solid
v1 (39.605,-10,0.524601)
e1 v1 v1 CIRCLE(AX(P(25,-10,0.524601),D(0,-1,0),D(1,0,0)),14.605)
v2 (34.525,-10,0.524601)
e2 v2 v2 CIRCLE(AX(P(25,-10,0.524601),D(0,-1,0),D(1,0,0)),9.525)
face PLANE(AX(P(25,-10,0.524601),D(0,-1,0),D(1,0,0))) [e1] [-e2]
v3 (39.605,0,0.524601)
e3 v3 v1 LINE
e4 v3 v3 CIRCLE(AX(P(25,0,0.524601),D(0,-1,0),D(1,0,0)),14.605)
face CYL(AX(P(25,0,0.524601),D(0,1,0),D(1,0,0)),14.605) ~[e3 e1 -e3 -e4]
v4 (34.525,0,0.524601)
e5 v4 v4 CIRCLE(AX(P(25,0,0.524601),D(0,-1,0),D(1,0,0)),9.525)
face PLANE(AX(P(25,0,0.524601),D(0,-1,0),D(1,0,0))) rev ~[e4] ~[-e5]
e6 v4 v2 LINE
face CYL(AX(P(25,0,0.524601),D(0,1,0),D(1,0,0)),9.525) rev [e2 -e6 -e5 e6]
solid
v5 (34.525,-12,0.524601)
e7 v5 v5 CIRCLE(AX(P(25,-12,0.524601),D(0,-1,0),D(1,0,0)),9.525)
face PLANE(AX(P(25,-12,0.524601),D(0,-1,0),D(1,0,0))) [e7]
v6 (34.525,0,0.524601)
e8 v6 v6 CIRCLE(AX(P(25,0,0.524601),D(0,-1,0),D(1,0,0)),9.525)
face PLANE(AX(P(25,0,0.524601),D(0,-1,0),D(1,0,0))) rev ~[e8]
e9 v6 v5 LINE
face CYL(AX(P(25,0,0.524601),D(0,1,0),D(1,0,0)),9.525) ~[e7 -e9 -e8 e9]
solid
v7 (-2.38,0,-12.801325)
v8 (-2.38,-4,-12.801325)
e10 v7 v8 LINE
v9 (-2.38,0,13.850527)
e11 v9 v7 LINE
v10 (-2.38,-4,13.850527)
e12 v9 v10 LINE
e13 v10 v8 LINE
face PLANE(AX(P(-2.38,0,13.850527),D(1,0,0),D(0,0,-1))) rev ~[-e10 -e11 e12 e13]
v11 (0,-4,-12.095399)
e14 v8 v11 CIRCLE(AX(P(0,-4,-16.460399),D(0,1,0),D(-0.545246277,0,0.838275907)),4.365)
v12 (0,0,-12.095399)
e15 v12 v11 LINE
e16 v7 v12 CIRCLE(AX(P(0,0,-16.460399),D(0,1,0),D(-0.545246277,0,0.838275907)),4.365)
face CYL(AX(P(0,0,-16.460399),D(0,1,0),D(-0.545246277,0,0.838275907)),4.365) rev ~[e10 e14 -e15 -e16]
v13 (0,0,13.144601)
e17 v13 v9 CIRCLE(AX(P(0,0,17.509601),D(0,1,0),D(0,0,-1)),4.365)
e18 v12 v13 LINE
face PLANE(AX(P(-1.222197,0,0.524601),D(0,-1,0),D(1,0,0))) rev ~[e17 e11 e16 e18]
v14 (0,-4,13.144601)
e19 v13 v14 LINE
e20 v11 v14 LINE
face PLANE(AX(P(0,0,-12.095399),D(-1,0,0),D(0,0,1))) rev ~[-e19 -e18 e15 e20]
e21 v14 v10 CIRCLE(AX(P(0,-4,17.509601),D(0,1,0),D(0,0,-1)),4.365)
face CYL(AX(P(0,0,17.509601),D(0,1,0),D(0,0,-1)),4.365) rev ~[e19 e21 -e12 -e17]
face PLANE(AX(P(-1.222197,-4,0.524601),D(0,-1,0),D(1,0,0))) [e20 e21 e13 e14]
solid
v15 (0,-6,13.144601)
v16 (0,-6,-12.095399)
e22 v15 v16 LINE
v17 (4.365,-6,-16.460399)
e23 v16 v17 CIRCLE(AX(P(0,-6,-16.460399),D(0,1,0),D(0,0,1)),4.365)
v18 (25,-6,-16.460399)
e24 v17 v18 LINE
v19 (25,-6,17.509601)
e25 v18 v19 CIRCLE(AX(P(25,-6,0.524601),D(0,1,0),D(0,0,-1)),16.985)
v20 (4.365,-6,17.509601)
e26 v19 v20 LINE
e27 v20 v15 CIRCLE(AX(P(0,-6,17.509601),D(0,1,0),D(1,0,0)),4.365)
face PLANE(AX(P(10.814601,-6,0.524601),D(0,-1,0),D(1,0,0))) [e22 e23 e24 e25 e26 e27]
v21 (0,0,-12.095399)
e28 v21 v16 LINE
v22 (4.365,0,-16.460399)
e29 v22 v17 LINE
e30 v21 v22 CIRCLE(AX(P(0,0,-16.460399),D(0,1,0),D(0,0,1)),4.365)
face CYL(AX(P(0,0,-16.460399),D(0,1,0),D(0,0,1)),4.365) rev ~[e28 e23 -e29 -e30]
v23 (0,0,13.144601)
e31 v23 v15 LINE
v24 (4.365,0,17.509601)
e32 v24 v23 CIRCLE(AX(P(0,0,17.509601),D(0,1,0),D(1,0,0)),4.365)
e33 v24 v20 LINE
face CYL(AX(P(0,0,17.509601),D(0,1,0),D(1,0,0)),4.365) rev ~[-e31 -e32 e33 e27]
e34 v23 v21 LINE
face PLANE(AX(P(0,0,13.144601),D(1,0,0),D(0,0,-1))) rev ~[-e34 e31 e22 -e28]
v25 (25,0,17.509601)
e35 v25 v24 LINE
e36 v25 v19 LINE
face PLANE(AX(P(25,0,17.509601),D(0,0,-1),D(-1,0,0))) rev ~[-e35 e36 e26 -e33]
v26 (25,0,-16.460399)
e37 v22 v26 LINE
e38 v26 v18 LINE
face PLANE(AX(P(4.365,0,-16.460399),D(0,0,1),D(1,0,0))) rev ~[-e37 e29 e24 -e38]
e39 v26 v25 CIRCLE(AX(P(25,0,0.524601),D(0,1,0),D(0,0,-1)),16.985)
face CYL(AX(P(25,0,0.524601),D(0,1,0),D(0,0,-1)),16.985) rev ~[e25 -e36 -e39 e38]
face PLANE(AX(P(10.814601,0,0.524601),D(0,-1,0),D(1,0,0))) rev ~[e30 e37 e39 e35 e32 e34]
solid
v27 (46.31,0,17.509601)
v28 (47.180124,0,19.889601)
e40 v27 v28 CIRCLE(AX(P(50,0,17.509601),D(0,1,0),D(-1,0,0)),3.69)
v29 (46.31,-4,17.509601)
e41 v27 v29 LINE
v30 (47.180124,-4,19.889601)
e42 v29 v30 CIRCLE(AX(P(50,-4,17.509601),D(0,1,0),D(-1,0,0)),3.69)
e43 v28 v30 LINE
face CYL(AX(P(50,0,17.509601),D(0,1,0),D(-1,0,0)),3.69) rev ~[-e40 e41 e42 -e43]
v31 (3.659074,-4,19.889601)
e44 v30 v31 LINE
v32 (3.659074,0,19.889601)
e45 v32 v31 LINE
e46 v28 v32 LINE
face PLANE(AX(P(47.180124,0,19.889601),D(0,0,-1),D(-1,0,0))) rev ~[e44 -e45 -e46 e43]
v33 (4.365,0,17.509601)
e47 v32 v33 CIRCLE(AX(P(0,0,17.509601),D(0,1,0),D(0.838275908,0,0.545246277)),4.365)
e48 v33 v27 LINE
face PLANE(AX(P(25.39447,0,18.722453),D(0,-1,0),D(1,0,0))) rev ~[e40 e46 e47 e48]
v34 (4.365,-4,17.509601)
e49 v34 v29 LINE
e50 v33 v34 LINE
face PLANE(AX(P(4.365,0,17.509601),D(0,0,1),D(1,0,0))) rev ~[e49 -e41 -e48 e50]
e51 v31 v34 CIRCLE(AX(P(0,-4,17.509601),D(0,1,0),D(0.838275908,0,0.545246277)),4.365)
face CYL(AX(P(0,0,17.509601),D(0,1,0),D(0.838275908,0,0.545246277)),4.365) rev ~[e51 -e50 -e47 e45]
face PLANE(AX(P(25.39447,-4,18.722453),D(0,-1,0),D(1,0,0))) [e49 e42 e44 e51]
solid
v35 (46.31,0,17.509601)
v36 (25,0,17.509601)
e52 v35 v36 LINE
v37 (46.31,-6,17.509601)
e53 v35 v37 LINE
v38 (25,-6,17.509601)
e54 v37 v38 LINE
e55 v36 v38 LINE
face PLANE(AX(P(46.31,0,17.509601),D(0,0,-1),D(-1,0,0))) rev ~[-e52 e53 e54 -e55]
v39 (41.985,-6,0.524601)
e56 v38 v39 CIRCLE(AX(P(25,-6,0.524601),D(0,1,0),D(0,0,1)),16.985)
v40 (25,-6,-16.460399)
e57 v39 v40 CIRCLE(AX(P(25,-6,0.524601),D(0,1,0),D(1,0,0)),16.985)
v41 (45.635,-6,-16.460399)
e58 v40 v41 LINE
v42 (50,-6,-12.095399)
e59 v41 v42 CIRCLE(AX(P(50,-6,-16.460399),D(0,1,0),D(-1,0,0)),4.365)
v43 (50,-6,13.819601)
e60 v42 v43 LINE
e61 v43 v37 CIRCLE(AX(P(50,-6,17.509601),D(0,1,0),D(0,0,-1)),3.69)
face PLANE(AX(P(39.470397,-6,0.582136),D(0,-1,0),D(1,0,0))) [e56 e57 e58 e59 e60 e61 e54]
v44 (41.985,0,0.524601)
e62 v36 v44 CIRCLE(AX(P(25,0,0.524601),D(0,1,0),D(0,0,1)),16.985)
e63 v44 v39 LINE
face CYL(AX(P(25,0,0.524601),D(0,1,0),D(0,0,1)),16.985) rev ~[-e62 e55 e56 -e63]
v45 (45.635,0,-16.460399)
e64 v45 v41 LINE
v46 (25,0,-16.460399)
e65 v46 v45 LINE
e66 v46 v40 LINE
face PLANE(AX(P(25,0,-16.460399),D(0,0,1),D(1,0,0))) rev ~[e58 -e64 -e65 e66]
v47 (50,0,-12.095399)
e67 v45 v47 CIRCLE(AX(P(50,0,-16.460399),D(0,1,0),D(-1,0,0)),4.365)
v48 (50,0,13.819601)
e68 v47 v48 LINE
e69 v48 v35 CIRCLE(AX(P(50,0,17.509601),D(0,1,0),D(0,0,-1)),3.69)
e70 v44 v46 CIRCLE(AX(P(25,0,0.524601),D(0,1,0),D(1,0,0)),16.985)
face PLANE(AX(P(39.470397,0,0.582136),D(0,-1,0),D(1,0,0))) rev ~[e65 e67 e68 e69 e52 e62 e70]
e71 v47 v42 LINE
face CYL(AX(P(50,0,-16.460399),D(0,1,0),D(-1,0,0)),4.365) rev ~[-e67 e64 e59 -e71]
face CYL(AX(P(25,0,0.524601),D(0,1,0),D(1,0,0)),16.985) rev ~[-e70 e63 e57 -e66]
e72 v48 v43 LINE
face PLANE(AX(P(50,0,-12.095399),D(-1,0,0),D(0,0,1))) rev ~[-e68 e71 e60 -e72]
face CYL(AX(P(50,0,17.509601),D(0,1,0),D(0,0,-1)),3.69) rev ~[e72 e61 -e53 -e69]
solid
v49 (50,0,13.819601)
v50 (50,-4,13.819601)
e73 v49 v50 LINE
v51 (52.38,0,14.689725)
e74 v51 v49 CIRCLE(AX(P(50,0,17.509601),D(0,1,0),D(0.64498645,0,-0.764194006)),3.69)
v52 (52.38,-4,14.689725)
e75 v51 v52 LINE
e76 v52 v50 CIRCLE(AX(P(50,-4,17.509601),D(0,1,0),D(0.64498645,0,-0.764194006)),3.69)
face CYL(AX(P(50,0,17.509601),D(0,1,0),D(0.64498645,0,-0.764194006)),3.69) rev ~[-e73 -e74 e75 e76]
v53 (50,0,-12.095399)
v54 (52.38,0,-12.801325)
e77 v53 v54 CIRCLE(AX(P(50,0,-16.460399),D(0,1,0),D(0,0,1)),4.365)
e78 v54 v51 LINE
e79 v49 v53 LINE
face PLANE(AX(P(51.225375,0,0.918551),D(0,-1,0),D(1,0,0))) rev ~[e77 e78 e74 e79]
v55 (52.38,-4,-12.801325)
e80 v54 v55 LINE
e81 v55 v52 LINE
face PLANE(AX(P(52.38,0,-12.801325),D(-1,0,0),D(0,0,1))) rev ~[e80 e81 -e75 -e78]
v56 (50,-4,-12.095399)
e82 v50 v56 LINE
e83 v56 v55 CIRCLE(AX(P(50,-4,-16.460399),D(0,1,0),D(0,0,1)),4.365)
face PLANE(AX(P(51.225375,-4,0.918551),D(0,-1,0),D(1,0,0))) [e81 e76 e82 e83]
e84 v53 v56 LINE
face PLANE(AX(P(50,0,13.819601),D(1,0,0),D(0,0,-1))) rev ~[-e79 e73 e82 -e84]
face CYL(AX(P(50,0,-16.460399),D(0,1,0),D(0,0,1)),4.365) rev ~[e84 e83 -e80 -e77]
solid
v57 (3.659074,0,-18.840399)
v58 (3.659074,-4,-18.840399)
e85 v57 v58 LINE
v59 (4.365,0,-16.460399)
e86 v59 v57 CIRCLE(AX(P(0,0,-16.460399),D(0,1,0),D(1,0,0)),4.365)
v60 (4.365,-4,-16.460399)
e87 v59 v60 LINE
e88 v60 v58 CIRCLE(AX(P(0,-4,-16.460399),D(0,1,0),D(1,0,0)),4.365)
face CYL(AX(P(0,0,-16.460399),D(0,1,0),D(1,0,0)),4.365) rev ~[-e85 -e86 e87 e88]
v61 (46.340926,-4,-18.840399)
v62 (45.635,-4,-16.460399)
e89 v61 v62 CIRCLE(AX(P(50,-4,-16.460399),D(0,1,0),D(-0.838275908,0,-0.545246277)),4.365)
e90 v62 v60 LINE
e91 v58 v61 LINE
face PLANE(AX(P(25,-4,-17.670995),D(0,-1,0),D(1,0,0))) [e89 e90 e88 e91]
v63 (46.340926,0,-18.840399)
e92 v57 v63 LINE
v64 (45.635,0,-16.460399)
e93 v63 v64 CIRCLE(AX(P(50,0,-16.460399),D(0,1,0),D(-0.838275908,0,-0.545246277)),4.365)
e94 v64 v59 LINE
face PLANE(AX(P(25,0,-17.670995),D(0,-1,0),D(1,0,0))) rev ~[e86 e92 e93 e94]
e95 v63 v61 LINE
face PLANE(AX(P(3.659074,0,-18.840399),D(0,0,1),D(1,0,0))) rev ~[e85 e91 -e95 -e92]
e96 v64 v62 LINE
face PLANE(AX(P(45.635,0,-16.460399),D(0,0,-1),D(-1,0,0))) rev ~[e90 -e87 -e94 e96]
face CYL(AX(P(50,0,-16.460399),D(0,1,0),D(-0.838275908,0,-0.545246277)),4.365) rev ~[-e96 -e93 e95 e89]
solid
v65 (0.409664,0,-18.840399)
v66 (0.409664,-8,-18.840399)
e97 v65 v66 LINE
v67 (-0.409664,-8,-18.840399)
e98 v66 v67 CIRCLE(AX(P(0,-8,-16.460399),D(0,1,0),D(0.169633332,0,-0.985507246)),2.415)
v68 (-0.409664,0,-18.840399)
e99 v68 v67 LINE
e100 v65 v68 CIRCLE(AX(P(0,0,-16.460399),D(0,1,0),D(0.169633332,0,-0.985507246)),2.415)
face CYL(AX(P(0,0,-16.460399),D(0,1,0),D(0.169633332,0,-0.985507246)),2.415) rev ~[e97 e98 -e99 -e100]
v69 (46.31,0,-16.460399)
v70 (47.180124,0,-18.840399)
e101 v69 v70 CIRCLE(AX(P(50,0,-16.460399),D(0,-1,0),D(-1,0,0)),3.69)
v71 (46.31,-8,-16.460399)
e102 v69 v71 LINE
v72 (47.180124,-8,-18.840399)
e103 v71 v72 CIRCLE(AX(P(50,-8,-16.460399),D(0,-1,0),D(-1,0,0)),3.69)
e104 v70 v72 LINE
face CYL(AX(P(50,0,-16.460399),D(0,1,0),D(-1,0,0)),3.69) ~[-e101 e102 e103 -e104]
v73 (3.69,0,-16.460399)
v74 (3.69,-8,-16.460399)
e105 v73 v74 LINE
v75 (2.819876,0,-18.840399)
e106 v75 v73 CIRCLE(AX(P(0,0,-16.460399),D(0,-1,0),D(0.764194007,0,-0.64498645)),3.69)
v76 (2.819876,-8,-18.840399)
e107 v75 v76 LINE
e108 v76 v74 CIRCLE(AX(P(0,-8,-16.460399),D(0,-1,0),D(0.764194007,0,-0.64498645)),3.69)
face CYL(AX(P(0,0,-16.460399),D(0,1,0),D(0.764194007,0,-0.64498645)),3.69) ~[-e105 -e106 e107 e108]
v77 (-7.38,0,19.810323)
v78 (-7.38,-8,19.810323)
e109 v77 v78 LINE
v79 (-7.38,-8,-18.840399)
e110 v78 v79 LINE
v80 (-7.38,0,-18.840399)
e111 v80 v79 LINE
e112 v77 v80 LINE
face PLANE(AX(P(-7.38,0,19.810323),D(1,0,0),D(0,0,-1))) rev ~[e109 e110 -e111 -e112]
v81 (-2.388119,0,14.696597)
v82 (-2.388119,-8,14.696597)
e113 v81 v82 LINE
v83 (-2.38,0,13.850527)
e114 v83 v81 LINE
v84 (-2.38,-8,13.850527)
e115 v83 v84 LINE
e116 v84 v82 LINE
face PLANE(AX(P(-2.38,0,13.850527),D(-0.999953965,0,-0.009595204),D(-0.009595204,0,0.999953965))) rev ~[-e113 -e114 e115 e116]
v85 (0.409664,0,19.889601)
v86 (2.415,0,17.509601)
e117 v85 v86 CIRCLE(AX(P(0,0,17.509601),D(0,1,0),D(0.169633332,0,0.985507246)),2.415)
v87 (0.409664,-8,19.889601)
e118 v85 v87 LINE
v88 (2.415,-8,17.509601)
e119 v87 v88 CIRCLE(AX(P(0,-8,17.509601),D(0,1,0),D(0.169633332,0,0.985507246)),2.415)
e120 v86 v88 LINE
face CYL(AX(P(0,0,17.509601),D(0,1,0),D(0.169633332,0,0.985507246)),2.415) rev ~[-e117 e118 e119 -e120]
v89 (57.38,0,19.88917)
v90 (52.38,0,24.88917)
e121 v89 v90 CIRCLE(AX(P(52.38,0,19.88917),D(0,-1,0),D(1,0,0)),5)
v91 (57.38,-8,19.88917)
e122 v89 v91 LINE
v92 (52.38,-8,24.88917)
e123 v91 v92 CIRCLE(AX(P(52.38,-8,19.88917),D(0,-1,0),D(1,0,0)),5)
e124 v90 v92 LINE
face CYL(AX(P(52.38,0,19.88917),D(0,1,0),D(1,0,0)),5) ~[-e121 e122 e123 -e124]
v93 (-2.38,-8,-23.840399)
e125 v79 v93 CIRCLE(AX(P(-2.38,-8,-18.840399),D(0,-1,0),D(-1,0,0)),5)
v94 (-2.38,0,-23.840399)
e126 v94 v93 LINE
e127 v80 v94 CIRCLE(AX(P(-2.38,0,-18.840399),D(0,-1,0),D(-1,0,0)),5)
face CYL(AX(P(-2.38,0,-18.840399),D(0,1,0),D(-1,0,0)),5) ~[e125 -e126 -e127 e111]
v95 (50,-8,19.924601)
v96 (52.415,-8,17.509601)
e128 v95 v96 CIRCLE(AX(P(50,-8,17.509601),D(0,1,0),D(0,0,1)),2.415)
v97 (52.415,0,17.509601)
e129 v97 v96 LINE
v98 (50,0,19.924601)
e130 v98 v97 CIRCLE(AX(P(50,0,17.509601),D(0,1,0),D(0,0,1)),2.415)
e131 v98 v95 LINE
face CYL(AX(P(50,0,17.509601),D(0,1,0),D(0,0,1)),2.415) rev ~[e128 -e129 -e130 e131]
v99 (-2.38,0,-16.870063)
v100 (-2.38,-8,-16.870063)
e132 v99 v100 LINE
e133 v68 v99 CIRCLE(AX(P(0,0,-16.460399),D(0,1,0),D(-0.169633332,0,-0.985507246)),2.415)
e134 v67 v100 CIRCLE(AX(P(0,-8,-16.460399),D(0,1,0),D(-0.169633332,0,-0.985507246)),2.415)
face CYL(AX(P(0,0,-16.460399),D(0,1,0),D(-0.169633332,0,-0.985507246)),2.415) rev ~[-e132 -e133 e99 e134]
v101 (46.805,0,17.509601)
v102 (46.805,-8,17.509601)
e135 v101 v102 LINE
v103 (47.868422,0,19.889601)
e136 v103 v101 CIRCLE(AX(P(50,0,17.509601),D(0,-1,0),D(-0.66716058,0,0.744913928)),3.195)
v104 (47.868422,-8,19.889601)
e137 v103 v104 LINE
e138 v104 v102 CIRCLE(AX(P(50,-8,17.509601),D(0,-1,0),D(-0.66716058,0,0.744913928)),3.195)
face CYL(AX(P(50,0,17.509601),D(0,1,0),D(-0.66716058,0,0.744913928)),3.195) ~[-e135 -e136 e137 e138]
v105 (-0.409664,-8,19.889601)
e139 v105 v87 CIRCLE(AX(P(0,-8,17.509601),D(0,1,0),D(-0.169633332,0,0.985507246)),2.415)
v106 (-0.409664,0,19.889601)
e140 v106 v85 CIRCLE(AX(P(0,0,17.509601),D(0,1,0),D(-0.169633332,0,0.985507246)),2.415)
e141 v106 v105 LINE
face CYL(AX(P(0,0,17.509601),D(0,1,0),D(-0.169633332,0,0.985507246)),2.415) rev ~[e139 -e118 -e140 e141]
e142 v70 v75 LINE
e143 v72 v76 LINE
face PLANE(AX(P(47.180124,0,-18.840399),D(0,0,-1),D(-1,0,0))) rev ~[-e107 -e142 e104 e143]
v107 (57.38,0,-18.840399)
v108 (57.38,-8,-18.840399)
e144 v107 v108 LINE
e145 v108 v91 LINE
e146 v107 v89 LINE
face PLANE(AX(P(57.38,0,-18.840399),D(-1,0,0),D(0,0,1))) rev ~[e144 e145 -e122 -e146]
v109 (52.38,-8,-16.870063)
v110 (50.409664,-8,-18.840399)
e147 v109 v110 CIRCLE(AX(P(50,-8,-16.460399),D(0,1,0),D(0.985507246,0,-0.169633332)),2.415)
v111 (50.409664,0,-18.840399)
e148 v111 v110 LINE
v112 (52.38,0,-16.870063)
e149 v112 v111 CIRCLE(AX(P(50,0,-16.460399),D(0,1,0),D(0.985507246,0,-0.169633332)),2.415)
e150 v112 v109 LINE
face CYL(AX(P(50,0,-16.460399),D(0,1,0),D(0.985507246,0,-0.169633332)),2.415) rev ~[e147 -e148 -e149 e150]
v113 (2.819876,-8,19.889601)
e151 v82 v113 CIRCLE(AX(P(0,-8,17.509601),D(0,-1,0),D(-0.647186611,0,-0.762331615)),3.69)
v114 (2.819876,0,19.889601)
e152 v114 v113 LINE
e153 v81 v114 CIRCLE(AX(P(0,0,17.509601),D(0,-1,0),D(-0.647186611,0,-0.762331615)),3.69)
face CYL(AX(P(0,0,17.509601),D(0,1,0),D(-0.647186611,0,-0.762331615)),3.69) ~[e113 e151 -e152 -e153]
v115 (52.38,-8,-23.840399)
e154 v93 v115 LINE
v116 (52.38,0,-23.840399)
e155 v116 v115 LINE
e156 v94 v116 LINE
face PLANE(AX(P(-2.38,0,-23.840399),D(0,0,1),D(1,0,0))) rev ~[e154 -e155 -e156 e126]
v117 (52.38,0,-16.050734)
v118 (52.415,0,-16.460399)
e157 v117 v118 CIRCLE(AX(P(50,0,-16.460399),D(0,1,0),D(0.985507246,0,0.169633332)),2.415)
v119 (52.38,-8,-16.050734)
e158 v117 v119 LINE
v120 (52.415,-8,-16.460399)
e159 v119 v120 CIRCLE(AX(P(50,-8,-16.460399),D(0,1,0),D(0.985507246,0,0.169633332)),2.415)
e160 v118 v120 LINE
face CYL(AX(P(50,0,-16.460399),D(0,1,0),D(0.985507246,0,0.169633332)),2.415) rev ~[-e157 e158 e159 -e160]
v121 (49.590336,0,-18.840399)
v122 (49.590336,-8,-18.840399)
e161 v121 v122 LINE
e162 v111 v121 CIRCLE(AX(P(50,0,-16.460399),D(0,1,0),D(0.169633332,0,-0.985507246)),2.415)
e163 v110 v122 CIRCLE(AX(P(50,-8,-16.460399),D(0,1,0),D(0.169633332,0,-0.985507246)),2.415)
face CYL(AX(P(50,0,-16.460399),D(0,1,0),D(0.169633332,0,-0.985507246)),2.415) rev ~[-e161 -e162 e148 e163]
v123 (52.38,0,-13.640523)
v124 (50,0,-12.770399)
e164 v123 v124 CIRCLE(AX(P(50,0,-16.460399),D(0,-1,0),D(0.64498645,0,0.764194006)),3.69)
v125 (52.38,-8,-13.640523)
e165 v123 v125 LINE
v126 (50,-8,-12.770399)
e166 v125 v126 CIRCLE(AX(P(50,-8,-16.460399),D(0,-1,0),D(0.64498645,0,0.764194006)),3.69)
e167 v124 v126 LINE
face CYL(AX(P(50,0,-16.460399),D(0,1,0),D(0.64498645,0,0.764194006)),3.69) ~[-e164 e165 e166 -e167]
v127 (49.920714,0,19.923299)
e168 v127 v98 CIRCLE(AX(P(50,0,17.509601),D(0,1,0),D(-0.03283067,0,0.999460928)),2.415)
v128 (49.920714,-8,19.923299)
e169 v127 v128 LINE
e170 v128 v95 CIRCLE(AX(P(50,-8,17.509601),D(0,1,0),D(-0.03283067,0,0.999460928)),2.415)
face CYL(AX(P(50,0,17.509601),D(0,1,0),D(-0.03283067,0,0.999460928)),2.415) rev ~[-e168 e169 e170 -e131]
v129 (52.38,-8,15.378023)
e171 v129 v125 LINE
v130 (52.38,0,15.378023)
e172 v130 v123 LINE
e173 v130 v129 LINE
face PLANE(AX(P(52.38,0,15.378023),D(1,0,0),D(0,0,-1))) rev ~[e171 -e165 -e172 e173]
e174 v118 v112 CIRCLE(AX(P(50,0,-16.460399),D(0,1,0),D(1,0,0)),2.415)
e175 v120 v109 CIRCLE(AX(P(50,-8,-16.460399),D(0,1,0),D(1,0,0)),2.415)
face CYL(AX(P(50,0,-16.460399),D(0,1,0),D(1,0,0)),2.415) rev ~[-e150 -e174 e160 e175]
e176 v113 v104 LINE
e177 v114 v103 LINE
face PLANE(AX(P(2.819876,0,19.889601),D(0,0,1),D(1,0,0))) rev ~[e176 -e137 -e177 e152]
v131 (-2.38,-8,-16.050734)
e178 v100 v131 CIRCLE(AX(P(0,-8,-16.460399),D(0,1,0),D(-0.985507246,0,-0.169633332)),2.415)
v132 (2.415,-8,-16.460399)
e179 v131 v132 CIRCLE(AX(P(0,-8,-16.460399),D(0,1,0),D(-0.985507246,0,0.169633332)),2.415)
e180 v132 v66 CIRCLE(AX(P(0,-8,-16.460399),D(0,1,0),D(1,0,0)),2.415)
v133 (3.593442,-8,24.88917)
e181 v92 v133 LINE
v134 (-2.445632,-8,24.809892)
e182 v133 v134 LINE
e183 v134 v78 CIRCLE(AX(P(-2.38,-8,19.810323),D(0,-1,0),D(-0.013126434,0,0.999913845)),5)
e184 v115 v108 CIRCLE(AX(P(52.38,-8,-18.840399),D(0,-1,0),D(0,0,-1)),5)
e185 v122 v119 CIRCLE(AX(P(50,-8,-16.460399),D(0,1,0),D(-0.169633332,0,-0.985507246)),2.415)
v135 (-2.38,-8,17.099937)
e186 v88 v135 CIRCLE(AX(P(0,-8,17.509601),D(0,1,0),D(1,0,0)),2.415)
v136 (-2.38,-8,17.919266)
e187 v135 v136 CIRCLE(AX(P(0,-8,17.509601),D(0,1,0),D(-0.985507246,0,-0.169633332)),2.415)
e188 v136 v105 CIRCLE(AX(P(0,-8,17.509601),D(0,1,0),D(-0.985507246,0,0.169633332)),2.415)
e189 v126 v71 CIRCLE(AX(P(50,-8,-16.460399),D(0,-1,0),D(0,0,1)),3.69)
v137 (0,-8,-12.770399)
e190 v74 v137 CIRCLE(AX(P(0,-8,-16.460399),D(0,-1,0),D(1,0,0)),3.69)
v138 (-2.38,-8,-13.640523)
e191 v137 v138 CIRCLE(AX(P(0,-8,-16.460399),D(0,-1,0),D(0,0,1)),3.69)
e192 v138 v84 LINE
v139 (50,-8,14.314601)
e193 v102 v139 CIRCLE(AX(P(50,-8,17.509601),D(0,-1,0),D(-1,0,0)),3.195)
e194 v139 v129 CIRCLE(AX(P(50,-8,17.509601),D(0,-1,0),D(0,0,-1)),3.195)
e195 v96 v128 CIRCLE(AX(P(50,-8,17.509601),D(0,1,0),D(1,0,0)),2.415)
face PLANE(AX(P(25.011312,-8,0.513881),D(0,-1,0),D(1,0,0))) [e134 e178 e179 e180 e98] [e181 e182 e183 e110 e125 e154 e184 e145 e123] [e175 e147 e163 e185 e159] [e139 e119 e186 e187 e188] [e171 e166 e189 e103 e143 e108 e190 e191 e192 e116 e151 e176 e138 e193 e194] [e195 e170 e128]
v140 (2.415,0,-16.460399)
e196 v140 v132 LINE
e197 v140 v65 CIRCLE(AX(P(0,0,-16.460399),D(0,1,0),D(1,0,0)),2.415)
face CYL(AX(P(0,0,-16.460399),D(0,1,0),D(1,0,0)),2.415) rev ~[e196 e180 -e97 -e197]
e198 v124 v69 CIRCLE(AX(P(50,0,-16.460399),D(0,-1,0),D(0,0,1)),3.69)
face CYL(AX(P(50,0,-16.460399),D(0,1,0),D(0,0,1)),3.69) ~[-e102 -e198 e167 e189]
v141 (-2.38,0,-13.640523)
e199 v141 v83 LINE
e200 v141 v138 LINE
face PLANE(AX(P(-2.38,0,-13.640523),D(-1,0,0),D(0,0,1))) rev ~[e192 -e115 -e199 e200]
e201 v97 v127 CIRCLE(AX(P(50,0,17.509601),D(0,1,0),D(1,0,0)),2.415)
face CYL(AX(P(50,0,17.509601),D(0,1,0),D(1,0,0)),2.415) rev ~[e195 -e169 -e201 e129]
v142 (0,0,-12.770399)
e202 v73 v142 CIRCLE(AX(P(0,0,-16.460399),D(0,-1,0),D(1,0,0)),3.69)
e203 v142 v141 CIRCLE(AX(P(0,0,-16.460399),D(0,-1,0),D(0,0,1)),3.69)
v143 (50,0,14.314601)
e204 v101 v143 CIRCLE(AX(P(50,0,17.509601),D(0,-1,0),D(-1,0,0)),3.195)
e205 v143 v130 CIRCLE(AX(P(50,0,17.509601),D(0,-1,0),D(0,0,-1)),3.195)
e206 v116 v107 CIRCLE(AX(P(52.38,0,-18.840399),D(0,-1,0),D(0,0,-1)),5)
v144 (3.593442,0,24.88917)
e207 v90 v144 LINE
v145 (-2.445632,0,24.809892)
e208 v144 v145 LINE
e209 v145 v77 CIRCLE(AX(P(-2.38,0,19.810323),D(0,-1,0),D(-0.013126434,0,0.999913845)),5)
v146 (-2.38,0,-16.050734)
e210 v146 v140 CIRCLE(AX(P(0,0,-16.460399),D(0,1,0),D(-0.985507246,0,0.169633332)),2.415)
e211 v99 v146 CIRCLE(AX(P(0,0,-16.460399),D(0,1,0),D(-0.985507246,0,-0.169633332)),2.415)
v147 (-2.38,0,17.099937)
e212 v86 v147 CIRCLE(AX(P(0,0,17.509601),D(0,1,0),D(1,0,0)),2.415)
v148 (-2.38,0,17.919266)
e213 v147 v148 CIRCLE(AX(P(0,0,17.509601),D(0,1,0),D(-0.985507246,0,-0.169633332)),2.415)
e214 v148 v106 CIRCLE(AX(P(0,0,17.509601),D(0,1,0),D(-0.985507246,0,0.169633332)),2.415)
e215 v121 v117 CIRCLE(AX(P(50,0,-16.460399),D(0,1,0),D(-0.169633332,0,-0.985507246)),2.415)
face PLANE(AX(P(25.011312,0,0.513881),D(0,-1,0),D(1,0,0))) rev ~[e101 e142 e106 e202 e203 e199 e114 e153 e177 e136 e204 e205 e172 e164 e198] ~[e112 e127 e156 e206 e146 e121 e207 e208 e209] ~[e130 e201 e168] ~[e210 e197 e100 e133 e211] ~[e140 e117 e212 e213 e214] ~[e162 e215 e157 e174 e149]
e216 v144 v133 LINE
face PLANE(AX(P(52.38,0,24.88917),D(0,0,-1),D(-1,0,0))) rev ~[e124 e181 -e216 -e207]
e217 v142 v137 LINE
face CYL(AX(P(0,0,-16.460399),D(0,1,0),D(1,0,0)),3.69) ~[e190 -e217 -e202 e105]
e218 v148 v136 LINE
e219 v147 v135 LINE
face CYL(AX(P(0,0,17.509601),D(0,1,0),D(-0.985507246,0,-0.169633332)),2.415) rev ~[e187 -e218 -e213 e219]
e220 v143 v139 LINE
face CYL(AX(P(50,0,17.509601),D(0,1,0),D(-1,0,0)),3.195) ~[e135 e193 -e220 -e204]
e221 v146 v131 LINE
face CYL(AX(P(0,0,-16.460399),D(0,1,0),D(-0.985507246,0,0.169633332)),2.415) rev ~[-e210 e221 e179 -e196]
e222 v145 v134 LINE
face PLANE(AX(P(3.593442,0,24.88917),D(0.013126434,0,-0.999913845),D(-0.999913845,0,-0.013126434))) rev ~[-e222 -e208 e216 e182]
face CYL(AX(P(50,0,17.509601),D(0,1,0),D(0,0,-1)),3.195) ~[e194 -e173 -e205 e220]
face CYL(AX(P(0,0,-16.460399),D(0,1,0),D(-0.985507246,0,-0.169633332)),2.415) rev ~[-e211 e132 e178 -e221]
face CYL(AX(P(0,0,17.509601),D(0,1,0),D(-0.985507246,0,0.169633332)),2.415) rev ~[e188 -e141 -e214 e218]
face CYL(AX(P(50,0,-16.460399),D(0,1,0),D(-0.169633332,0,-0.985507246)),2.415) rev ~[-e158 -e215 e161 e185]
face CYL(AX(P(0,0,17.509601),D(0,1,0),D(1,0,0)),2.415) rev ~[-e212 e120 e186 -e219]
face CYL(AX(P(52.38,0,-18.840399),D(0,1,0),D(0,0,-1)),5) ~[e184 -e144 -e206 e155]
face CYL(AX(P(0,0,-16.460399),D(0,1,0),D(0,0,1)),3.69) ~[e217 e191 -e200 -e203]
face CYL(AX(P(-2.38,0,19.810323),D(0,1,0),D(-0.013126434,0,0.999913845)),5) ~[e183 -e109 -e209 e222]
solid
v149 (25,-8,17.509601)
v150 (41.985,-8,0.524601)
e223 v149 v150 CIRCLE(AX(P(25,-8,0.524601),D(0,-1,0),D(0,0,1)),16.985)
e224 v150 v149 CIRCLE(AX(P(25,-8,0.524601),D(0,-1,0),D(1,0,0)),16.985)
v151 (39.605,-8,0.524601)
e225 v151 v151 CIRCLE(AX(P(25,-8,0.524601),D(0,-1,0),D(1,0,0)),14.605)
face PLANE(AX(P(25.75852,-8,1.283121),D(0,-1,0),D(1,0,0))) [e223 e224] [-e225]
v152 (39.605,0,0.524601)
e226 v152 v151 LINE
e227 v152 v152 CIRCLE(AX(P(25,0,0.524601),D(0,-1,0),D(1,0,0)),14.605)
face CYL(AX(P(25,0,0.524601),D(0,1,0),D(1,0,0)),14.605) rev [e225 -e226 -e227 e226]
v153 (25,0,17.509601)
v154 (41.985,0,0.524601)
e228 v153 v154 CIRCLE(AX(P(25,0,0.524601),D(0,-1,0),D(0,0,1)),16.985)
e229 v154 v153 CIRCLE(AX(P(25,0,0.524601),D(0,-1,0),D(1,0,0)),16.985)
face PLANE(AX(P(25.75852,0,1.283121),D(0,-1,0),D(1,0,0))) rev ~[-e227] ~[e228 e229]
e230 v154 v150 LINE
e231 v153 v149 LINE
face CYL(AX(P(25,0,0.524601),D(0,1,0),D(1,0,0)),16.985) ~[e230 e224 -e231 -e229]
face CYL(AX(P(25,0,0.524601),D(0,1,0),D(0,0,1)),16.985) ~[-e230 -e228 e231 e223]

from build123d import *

# Parameters (mm, degrees)
F0_R     = 9.525
F1_DEPTH = 12
F3_DEPTH = 6
F0_R_2   = 14.605
F4_DEPTH = 8
F5_DEPTH = 10
F6_DEPTH = 8
F7_DEPTH = 4


# Not quite as in the source:
# - a feature of the source that left no trace in its solid (it failed there, or was rolled back) is left out


with BuildPart() as f1:
    # F0 (on Front) → F1 (new body)
    with BuildSketch(Plane.XZ):
        with Locations((25, 0.5246010458)):
            Circle(F0_R)
    extrude(amount=F1_DEPTH)


with BuildPart() as f3:
    # F0 (on Front) → F3 (new body)
    with BuildSketch(Plane.XZ):
        with BuildLine():
            ThreePointArc((25, -16.4603989542), (8.015, 0.5246010458), (25, 17.5096010458))
            Line((25, 17.5096010458), (6.92, 17.5096010458))
            Line((6.92, 17.5096010458), (4.365, 17.5096010458))
            ThreePointArc((4.365, 17.5096010458), (3.0865210999, 14.423079946), (0, 13.1446010458))
            Line((0, 13.1446010458), (0, 10.59))
            Line((0, 10.59), (0, 0))
            Line((0, 0), (0, -10.59))
            Line((0, -10.59), (0, -12.0953989542))
            ThreePointArc((0, -12.0953989542), (3.0865210999, -13.3738778543), (4.365, -16.4603989542))
            Line((4.365, -16.4603989542), (25, -16.4603989542))
        make_face()
    extrude(amount=F3_DEPTH)


with BuildPart() as f3b:
    # F0 (on Front) → F3, piece 2 (new body)
    with BuildSketch(Plane.XZ):
        with BuildLine():
            ThreePointArc((25, 17.5096010458), (37.0102086785, 12.5348097243), (41.985, 0.5246010458))
            ThreePointArc((41.985, 0.5246010458), (37.0102086785, -11.4856076326), (25, -16.4603989542))
            Line((25, -16.4603989542), (45.635, -16.4603989542))
            ThreePointArc((45.635, -16.4603989542), (46.9134789001, -13.3738778543), (50, -12.0953989542))
            Line((50, -12.0953989542), (50, 13.8196010458))
            ThreePointArc((50, 13.8196010458), (47.3907759774, 14.9003770233), (46.31, 17.5096010458))
            Line((46.31, 17.5096010458), (25, 17.5096010458))
        make_face()
    extrude(amount=F3_DEPTH)


with BuildPart() as f4:
    # F0 (on Front) → F4 (new body)
    with BuildSketch(Plane.XZ):
        with BuildLine():
            ThreePointArc((25, -16.4603989542), (37.0102086785, -11.4856076326), (41.985, 0.5246010458))
            ThreePointArc((41.985, 0.5246010458), (37.0102086785, 12.5348097243), (25, 17.5096010458))
            ThreePointArc((25, 17.5096010458), (8.015, 0.5246010458), (25, -16.4603989542))
        make_face()
        with Locations((25, 0.5246010458)):
            Circle(F0_R_2, mode=Mode.SUBTRACT)
    extrude(amount=F4_DEPTH)


with BuildPart() as f5:
    # F0 (on Front) → F5 (new body)
    with BuildSketch(Plane.XZ):
        with Locations((25, 0.5246010458)):
            Circle(F0_R_2)
        with Locations((25, 0.5246010458)):
            Circle(F0_R, mode=Mode.SUBTRACT)
    extrude(amount=F5_DEPTH)


with BuildPart() as f6:
    # F0 (on Front) → F6 (new body)
    with BuildSketch(Plane.XZ):
        with BuildLine():
            Line((-7.38, 19.8103227064), (-7.38, 0))
            Line((-7.38, 0), (-7.38, -18.8403989542))
            ThreePointArc((-7.38, -18.8403989542), (-5.9155339059, -22.3759328601), (-2.38, -23.8403989542))
            Line((-2.38, -23.8403989542), (52.38, -23.8403989542))
            ThreePointArc((52.38, -23.8403989542), (55.9155339059, -22.3759328601), (57.38, -18.8403989542))
            Line((57.38, -18.8403989542), (57.38, 0))
            Line((57.38, 0), (57.38, 19.8891702691))
            ThreePointArc((57.38, 19.8891702691), (55.9155339059, 23.4247041751), (52.38, 24.8891702691))
            Line((52.38, 24.8891702691), (3.5934421678, 24.8891702691))
            Line((3.5934421678, 24.8891702691), (-2.4456321687, 24.8098919297))
            ThreePointArc((-2.4456321687, 24.8098919297), (-5.9386627294, 23.3225754847), (-7.38, 19.8103227064))
        make_face()
        with BuildLine():
            ThreePointArc((-0.4096644969, -18.8403989542), (-1.7076628766, -18.1680618307), (-2.38, -16.870063451))
            ThreePointArc((-2.38, -16.870063451), (-2.415, -16.4603989542), (-2.38, -16.0507344573))
            ThreePointArc((-2.38, -16.0507344573), (0.2055784522, -14.0541648633), (2.415, -16.4603989542))
            ThreePointArc((2.415, -16.4603989542), (1.8468303604, -18.0164974793), (0.4096644969, -18.8403989542))
            ThreePointArc((0.4096644969, -18.8403989542), (0, -18.8753989542), (-0.4096644969, -18.8403989542))
        make_face(mode=Mode.SUBTRACT)
        with BuildLine():
            ThreePointArc((52.415, -16.4603989542), (52.4062340909, -16.6659774063), (52.38, -16.870063451))
            ThreePointArc((52.38, -16.870063451), (51.7076628766, -18.1680618307), (50.4096644969, -18.8403989542))
            ThreePointArc((50.4096644969, -18.8403989542), (50, -18.8753989542), (49.5903355031, -18.8403989542))
            ThreePointArc((49.5903355031, -18.8403989542), (48.2923371234, -14.7527360776), (52.38, -16.0507344573))
            ThreePointArc((52.38, -16.0507344573), (52.4062340909, -16.254820502), (52.415, -16.4603989542))
        make_face(mode=Mode.SUBTRACT)
        with BuildLine():
            ThreePointArc((47.8684219461, 19.8896010458), (47.0829452454, 18.8129876189), (46.805, 17.5096010458))
            ThreePointArc((46.805, 17.5096010458), (47.7407938341, 15.25039488), (50, 14.3146010458))
            ThreePointArc((50, 14.3146010458), (51.3033865731, 14.5925462913), (52.38, 15.3780229919))
            Line((52.38, 15.3780229919), (52.38, 14.6897251621))
            Line((52.38, 14.6897251621), (52.38, -12.8013246177))
            Line((52.38, -12.8013246177), (52.38, -13.6405230704))
            ThreePointArc((52.38, -13.6405230704), (51.2670355143, -12.9947502406), (50, -12.7703989542))
            ThreePointArc((50, -12.7703989542), (47.3907759774, -13.8511749316), (46.31, -16.4603989542))
            ThreePointArc((46.31, -16.4603989542), (46.5343512865, -17.7274344684), (47.1801241162, -18.8403989542))
            Line((47.1801241162, -18.8403989542), (46.3409256635, -18.8403989542))
            Line((46.3409256635, -18.8403989542), (3.6590743365, -18.8403989542))
            Line((3.6590743365, -18.8403989542), (2.8198758838, -18.8403989542))
            ThreePointArc((2.8198758838, -18.8403989542), (3.4656487135, -17.7274344684), (3.69, -16.4603989542))
            ThreePointArc((3.69, -16.4603989542), (2.6092240226, -13.8511749316), (0, -12.7703989542))
            ThreePointArc((0, -12.7703989542), (-1.2670355143, -12.9947502406), (-2.38, -13.6405230704))
            Line((-2.38, -13.6405230704), (-2.38, -12.8013246177))
            Line((-2.38, -12.8013246177), (-2.38, 13.8505267094))
            Line((-2.38, 13.8505267094), (-2.3881185942, 14.6965973878))
            ThreePointArc((-2.3881185942, 14.6965973878), (2.6054606766, 14.8966190975), (2.8198758838, 19.8896010458))
            Line((2.8198758838, 19.8896010458), (3.6590743365, 19.8896010458))
            Line((3.6590743365, 19.8896010458), (4.3602697551, 19.8896010458))
            Line((4.3602697551, 19.8896010458), (47.1801241162, 19.8896010458))
            Line((47.1801241162, 19.8896010458), (47.8684219461, 19.8896010458))
        make_face(mode=Mode.SUBTRACT)
        with BuildLine():
            ThreePointArc((2.415, 17.5096010458), (0.2055784522, 15.103366955), (-2.38, 17.099936549))
            ThreePointArc((-2.38, 17.099936549), (-2.415, 17.5096010458), (-2.38, 17.9192655427))
            ThreePointArc((-2.38, 17.9192655427), (-1.7076628766, 19.2172639224), (-0.4096644969, 19.8896010458))
            ThreePointArc((-0.4096644969, 19.8896010458), (0, 19.9246010458), (0.4096644969, 19.8896010458))
            ThreePointArc((0.4096644969, 19.8896010458), (1.8468303604, 19.065699571), (2.415, 17.5096010458))
        make_face(mode=Mode.SUBTRACT)
        with BuildLine():
            ThreePointArc((50, 19.9246010458), (51.7076628766, 19.2172639224), (52.415, 17.5096010458))
            ThreePointArc((52.415, 17.5096010458), (48.3206029126, 15.7741326875), (49.9207139355, 19.9232991877))
            ThreePointArc((49.9207139355, 19.9232991877), (49.9603516241, 19.9242755594), (50, 19.9246010458))
        make_face(mode=Mode.SUBTRACT)
    extrude(amount=F6_DEPTH)


with BuildPart() as f7:
    # F0 (on Front) → F7 (new body)
    with BuildSketch(Plane.XZ):
        with BuildLine():
            Line((45.635, -16.4603989542), (25, -16.4603989542))
            Line((25, -16.4603989542), (4.365, -16.4603989542))
            ThreePointArc((4.365, -16.4603989542), (4.1847989485, -17.7016413804), (3.6590743365, -18.8403989542))
            Line((3.6590743365, -18.8403989542), (46.3409256635, -18.8403989542))
            ThreePointArc((46.3409256635, -18.8403989542), (45.8152010515, -17.7016413804), (45.635, -16.4603989542))
        make_face()
    extrude(amount=F7_DEPTH)


with BuildPart() as f7b:
    # F0 (on Front) → F7, piece 2 (new body)
    with BuildSketch(Plane.XZ):
        with BuildLine():
            ThreePointArc((-2.38, -12.8013246177), (-1.2412424262, -12.2756000056), (0, -12.0953989542))
            Line((0, -12.0953989542), (0, -10.59))
            Line((0, -10.59), (0, 0))
            Line((0, 0), (0, 10.59))
            Line((0, 10.59), (0, 13.1446010458))
            ThreePointArc((0, 13.1446010458), (-1.2412424262, 13.3248020973), (-2.38, 13.8505267094))
            Line((-2.38, 13.8505267094), (-2.38, -12.8013246177))
        make_face()
    extrude(amount=F7_DEPTH)


with BuildPart() as f7c:
    # F0 (on Front) → F7, piece 3 (new body)
    with BuildSketch(Plane.XZ):
        with BuildLine():
            Line((6.92, 17.5096010458), (25, 17.5096010458))
            Line((25, 17.5096010458), (46.31, 17.5096010458))
            ThreePointArc((46.31, 17.5096010458), (46.5343512865, 18.7766365601), (47.1801241162, 19.8896010458))
            Line((47.1801241162, 19.8896010458), (4.3602697551, 19.8896010458))
            Line((4.3602697551, 19.8896010458), (3.6590743365, 19.8896010458))
            ThreePointArc((3.6590743365, 19.8896010458), (4.1847989485, 18.750843472), (4.365, 17.5096010458))
            Line((4.365, 17.5096010458), (6.92, 17.5096010458))
        make_face()
    extrude(amount=F7_DEPTH)


with BuildPart() as f7d:
    # F0 (on Front) → F7, piece 4 (new body)
    with BuildSketch(Plane.XZ):
        with BuildLine():
            ThreePointArc((52.38, 14.6897251621), (51.2670355143, 14.0439523323), (50, 13.8196010458))
            Line((50, 13.8196010458), (50, -12.0953989542))
            ThreePointArc((50, -12.0953989542), (51.2412424262, -12.2756000056), (52.38, -12.8013246177))
            Line((52.38, -12.8013246177), (52.38, 14.6897251621))
        make_face()
    extrude(amount=F7_DEPTH)


solid = Compound([f1.part, f3.part, f3b.part, f4.part, f5.part, f6.part, f7.part, f7b.part, f7c.part, f7d.part])
